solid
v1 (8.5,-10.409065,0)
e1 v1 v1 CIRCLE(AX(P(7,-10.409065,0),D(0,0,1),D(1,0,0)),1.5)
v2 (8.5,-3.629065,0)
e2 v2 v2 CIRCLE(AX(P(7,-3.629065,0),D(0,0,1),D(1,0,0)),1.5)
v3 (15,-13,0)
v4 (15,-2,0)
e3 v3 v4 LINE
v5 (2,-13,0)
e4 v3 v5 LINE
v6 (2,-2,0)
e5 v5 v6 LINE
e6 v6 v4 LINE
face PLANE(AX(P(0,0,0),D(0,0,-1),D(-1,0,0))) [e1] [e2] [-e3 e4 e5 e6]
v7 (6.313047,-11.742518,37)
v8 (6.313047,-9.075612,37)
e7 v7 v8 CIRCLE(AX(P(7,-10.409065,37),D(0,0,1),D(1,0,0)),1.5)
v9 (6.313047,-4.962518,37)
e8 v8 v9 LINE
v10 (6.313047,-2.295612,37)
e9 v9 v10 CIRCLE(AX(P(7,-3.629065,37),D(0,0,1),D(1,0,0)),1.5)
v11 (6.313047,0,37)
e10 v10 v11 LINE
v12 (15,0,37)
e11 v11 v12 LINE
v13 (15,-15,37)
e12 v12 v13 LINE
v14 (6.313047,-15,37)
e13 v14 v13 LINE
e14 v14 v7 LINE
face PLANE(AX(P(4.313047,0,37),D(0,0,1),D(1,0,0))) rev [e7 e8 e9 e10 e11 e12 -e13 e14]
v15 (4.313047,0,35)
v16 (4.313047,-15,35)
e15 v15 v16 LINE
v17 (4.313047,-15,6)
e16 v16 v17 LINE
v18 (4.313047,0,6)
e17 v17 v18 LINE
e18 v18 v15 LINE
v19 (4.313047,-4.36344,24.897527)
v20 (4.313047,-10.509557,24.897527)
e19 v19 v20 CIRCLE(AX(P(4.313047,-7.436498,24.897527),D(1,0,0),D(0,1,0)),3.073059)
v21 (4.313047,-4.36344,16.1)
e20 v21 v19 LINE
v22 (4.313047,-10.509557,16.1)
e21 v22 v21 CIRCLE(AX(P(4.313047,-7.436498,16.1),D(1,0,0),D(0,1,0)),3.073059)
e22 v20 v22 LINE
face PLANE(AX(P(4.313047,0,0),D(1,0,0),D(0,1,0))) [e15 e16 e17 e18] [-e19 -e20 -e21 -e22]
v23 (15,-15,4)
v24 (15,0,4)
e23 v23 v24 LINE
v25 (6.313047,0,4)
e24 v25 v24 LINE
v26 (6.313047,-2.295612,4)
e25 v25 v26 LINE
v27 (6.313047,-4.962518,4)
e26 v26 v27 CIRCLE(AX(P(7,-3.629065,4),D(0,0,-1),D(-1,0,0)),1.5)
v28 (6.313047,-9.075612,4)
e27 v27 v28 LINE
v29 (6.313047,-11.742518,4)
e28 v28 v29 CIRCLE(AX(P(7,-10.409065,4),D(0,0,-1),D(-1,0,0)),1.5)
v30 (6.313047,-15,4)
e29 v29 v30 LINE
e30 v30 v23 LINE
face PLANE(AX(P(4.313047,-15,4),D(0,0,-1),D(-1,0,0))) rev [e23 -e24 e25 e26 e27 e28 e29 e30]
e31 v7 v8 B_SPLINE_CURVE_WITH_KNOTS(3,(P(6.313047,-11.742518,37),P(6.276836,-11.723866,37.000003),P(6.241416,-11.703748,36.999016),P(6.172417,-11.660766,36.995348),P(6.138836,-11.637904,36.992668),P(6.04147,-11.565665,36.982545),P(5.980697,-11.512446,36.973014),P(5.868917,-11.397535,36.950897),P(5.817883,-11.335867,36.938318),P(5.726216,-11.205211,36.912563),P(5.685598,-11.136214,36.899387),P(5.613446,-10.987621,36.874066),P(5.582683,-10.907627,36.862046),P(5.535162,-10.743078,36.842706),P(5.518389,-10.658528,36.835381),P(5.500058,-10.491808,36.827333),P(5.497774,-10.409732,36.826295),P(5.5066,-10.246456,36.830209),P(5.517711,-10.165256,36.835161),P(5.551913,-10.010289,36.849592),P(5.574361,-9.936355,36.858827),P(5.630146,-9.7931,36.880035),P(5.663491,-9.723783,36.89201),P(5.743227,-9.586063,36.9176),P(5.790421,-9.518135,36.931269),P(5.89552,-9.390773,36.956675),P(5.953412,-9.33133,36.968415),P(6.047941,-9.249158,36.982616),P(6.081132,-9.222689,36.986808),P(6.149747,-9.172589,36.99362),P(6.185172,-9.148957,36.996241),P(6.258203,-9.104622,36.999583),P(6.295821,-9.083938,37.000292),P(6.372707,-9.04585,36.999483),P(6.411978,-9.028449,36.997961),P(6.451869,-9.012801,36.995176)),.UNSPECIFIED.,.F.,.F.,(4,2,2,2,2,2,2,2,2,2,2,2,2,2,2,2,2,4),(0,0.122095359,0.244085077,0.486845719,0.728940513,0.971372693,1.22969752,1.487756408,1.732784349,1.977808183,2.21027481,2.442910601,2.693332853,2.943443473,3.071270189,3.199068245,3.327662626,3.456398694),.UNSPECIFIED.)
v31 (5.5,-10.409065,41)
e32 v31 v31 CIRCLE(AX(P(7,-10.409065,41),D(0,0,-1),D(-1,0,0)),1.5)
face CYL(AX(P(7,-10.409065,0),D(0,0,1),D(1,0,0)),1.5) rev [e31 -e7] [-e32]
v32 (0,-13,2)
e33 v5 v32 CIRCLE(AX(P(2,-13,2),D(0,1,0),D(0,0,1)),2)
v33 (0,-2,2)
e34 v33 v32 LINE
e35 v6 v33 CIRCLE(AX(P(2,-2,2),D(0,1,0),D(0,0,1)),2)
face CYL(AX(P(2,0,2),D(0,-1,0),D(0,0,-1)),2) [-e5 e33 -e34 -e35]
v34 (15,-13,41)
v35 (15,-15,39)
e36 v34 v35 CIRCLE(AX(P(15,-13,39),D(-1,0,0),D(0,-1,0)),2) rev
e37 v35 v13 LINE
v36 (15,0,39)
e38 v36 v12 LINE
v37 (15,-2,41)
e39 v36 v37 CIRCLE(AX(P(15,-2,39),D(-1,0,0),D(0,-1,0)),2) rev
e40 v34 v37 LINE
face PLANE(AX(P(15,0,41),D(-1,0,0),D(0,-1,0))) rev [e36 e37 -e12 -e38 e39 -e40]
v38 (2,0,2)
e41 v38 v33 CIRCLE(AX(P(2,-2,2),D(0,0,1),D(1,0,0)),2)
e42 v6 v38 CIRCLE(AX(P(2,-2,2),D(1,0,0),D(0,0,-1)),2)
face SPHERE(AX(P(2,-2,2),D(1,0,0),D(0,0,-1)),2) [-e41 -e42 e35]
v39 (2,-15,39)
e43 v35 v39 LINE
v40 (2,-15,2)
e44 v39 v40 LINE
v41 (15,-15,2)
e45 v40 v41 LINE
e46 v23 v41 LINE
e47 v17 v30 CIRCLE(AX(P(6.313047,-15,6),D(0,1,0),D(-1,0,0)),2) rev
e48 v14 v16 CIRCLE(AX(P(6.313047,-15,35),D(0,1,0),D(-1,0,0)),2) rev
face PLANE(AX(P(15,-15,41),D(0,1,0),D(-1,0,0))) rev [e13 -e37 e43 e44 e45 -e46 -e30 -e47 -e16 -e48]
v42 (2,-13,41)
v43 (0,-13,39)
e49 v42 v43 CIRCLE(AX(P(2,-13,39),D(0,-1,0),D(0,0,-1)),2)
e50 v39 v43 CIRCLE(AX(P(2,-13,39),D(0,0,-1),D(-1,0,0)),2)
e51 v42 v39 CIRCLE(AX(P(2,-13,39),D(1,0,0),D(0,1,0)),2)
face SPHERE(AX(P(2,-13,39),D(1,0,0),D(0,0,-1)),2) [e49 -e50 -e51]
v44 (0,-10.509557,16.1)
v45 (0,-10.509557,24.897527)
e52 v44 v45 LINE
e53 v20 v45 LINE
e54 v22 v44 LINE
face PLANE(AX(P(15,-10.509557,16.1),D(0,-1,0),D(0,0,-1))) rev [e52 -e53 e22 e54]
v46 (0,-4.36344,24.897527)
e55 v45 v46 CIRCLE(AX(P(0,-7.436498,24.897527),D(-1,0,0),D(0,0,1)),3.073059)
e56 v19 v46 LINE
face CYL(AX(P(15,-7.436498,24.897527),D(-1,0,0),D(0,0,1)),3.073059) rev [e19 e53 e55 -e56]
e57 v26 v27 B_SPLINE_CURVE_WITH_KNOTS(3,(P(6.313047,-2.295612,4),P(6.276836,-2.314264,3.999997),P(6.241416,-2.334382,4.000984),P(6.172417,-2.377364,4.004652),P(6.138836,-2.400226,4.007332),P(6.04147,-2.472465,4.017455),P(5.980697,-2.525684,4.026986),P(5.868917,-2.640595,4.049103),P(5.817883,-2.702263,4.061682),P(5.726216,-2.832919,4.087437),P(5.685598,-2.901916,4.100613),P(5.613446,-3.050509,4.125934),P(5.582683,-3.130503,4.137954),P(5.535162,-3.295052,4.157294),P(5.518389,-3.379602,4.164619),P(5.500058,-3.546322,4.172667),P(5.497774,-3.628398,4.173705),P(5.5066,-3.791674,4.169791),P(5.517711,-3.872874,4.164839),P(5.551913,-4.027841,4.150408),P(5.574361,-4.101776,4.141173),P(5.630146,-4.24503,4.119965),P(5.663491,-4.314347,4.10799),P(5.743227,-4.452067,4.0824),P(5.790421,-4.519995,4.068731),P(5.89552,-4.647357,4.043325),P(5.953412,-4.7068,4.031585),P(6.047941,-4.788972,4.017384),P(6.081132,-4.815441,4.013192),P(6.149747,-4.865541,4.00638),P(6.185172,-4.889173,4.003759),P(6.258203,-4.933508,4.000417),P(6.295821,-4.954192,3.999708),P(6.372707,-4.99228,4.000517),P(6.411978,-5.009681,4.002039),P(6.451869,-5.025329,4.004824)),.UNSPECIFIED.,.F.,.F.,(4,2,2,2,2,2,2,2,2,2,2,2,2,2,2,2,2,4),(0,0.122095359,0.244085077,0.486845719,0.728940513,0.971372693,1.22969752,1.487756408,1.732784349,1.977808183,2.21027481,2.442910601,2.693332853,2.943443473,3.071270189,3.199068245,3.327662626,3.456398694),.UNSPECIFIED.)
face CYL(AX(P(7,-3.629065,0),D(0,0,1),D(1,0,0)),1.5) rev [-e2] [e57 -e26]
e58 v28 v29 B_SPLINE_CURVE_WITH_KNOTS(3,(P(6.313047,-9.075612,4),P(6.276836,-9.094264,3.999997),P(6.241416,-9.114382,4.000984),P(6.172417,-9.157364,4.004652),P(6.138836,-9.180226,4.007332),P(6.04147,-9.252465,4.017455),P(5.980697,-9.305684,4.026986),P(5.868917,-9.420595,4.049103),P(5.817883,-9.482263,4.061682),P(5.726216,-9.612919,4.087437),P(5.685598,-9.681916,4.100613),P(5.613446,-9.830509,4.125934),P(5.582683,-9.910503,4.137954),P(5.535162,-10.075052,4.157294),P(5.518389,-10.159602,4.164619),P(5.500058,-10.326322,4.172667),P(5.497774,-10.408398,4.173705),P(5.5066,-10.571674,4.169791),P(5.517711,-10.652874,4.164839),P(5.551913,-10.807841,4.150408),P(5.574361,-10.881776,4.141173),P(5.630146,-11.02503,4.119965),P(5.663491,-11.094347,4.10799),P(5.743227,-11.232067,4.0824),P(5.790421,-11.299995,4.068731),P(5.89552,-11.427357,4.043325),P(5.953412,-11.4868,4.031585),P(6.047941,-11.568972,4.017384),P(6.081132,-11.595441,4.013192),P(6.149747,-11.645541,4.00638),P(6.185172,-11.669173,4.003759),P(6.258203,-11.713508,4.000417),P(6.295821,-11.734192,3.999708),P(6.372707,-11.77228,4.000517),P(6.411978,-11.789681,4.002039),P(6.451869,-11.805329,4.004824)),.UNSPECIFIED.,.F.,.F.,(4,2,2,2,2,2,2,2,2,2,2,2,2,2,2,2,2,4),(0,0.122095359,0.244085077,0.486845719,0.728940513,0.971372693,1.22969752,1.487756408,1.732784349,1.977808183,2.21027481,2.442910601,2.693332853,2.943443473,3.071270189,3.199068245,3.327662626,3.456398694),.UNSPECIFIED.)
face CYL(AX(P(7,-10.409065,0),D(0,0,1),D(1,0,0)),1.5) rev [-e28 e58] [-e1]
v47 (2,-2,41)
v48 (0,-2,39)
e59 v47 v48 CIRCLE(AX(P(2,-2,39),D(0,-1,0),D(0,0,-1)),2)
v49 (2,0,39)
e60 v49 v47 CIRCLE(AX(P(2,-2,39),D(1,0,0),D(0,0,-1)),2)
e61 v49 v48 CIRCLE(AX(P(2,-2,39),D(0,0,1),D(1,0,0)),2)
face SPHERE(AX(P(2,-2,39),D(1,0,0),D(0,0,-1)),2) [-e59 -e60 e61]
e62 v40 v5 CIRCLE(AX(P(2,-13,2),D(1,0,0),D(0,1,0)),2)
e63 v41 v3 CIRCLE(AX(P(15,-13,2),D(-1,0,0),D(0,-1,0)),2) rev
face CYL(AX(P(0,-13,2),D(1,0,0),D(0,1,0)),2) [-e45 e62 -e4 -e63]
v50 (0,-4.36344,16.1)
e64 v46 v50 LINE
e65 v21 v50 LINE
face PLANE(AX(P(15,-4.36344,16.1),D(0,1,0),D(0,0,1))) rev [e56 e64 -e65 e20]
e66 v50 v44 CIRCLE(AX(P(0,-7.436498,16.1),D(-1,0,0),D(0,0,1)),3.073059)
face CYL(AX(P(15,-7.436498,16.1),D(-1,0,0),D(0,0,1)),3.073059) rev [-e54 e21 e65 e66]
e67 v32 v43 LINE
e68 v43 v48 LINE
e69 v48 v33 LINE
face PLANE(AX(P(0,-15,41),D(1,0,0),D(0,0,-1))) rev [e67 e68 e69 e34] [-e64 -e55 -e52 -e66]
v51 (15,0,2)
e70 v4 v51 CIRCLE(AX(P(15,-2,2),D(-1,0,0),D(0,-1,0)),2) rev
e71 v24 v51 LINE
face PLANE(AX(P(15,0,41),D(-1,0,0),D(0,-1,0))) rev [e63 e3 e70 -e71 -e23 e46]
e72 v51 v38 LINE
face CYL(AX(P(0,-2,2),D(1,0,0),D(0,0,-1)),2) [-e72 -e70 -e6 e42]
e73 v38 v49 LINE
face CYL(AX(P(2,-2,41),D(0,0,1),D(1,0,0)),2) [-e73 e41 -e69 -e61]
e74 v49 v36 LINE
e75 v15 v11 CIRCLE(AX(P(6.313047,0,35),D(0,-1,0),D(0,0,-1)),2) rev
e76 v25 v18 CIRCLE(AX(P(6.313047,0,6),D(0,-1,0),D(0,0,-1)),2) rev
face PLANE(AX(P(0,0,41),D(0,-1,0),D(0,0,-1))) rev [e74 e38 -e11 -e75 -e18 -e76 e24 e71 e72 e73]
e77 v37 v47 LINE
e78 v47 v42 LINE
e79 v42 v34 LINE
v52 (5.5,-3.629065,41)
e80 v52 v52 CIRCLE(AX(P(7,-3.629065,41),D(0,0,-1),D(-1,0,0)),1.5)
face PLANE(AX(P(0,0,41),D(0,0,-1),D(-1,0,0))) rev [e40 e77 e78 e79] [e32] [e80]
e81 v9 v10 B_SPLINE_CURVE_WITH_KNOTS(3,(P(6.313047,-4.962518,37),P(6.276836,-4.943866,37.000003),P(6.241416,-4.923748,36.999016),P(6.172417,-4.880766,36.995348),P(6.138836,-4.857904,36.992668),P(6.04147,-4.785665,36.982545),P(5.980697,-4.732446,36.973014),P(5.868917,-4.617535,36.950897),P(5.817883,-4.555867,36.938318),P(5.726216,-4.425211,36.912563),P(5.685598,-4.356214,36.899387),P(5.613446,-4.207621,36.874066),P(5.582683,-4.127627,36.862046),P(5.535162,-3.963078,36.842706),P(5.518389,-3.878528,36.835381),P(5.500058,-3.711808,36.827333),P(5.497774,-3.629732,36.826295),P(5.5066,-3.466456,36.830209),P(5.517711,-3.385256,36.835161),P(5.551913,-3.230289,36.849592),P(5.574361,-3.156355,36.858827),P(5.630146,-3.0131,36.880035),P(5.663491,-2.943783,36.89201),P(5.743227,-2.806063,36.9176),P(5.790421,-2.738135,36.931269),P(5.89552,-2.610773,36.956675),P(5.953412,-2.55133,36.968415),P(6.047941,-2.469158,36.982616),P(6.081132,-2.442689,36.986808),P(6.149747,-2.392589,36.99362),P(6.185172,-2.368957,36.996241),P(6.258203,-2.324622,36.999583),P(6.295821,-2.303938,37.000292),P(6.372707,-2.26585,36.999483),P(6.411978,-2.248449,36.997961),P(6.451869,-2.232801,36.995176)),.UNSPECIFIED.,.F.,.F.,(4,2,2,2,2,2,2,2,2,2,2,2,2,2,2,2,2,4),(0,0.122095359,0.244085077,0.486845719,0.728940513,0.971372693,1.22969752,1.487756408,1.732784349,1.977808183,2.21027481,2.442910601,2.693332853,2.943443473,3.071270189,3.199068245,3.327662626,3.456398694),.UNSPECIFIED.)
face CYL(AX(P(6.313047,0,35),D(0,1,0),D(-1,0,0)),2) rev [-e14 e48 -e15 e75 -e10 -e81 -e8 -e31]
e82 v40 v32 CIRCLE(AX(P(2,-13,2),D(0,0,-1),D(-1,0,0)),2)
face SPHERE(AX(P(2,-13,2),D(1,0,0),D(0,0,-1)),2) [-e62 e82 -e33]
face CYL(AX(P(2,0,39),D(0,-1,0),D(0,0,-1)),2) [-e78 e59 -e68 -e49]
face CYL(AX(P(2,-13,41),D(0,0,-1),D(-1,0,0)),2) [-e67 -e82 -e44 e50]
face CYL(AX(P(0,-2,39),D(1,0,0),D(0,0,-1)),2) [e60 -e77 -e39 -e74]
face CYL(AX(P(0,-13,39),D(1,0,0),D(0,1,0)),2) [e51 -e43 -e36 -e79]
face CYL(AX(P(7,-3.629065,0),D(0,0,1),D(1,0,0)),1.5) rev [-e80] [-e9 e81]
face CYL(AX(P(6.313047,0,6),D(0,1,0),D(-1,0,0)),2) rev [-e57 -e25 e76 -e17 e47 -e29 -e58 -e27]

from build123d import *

# Parameters (mm, degrees)
SKETCH_1_W               = 15
SKETCH_1_H               = 15
EXTRUDE_1_DEPTH          = 41
SKETCH_2_W               = 33
SKETCH_2_H               = 15
CUT_EXTRUDE_1_DEPTH      = 10.686952674
CUT_EXTRUDE_3_DEPTH      = 47.16275555
CUT_EXTRUDE_3_DEPTH_BACK = 47.16275555
SKETCH_3_R               = 1.5
CUT_EXTRUDE_4_DEPTH      = 47.16275555
FILLET_1_R               = 2
FILLET_2_R               = 2
FILLET_3_R               = 2
FILLET_4_R               = 2
FILLET_5_R               = 2
FILLET_6_R               = 2
FILLET_7_R               = 2


with BuildPart() as part:
    # 草图1 → 凸台-拉伸1 (new body)
    with BuildSketch(Plane.XY):
        with Locations((7.5, -7.5)):
            Rectangle(SKETCH_1_W, SKETCH_1_H)
    extrude(amount=EXTRUDE_1_DEPTH)

    # 草图2 → 切除-拉伸1 (cut)
    with BuildSketch(Plane(origin=(15, 0, 0), x_dir=(0, 0, -1), z_dir=(1, 0, 0))):
        with Locations((-20.5, -7.5)):
            Rectangle(SKETCH_2_W, SKETCH_2_H)
    extrude(amount=-CUT_EXTRUDE_1_DEPTH, mode=Mode.SUBTRACT)

    # 草图3 → 切除-拉伸3 (cut, two sides: drawn at the far end of the back side and taken through both)
    with BuildSketch(Plane.XY.offset(41).offset(-CUT_EXTRUDE_3_DEPTH_BACK)):
        with Locations((7, -3.629065036)):
            Circle(SKETCH_3_R)
        with Locations((7, -10.409065036)):
            Circle(SKETCH_3_R)
    extrude(amount=CUT_EXTRUDE_3_DEPTH + CUT_EXTRUDE_3_DEPTH_BACK, mode=Mode.SUBTRACT)

    # 草图4 → 切除-拉伸4 (cut, through all)
    with BuildSketch(Plane.ZY):
        with BuildLine():
            Line((16.1, -4.363439511), (24.89752721, -4.363439511))
            ThreePointArc((24.89752721, -4.363439511), (27.970585717, -7.436498018), (24.89752721, -10.509556524))
            Line((24.89752721, -10.509556524), (16.1, -10.509556524))
            ThreePointArc((16.1, -10.509556524), (13.026941494, -7.436498018), (16.1, -4.363439511))
        make_face()
    extrude(amount=-CUT_EXTRUDE_4_DEPTH, mode=Mode.SUBTRACT)

    # 圆角1
    fillet_1_edges = [part.edges().sort_by_distance(p)[0] for p in [
        (7.5, 0, 41),
    ]]
    fillet(fillet_1_edges, radius=FILLET_1_R)

    # 圆角2
    # the kernel refuses this fillet: 2 mm, written as the material it adds along each edge
    with BuildSketch(Plane(origin=(4.313047326, 0, 37), x_dir=(1, 0, 0), z_dir=(0, -1, 0))) as fillet_2_piece_1_section:
        with BuildLine():
            CenterArc((FILLET_2_R, -FILLET_2_R), FILLET_2_R, 90, 90)
            Line((0, -FILLET_2_R), (0, 0))
            Line((0, 0), (FILLET_2_R, 0))
        make_face()
    fillet_2_piece_1 = extrude(amount=15, mode=Mode.PRIVATE)
    fillet_2_piece_1 = fillet_2_piece_1 - Plane(origin=(7, -10.409065036, 36.539920903), x_dir=(1, 0, 0), z_dir=(0, 0, 1)) * Cylinder(1.5, 38, mode=Mode.PRIVATE)
    fillet_2_piece_1 = fillet_2_piece_1 - Plane(origin=(7, -3.629065036, 36.539920903), x_dir=(1, 0, 0), z_dir=(0, 0, 1)) * Cylinder(1.5, 38, mode=Mode.PRIVATE)
    add(fillet_2_piece_1)

    # 圆角3
    # the kernel refuses this fillet: 2 mm, written as the material it adds along each edge
    with BuildSketch(Plane(origin=(4.313047326, -15, 4), x_dir=(0, 0, 1), z_dir=(0, 1, 0))) as fillet_3_piece_1_section:
        with BuildLine():
            CenterArc((FILLET_3_R, FILLET_3_R), FILLET_3_R, 180, 90)
            Line((0, FILLET_3_R), (0, 0))
            Line((0, 0), (FILLET_3_R, 0))
        make_face()
    fillet_3_piece_1 = extrude(amount=15, mode=Mode.PRIVATE)
    fillet_3_piece_1 = fillet_3_piece_1 - Plane(origin=(7, -10.409065036, 4.460079004), x_dir=(1, 0, 0), z_dir=(0, 0, 1)) * Cylinder(1.5, 38, mode=Mode.PRIVATE)
    fillet_3_piece_1 = fillet_3_piece_1 - Plane(origin=(7, -3.629065036, 4.460079004), x_dir=(1, 0, 0), z_dir=(0, 0, 1)) * Cylinder(1.5, 38, mode=Mode.PRIVATE)
    add(fillet_3_piece_1)

    # 圆角4
    fillet_4_edges = [part.edges().sort_by_distance(p)[0] for p in [
        (7.5, -15, 41),
    ]]
    fillet(fillet_4_edges, radius=FILLET_4_R)

    # 圆角5
    fillet_5_edges = [part.edges().sort_by_distance(p)[0] for p in [
        (7.5, 0, 0),
    ]]
    fillet(fillet_5_edges, radius=FILLET_5_R)

    # 圆角6
    fillet_6_edges = [part.edges().sort_by_distance(p)[0] for p in [
        (7.5, -15, 0),
    ]]
    fillet(fillet_6_edges, radius=FILLET_6_R)

    # 圆角7
    fillet_7_edges = [part.edges().sort_by_distance(p)[0] for p in [
        (0, -15, 20.5),
        (0, -14.414213562, 40.414213562),
        (0, -7.5, 0),
        (0, -0.585786438, 0.585786438),
        (0, -14.414213562, 0.585786438),
        (0, 0, 20.5),
        (0, -7.5, 41),
        (0, -0.585786438, 40.414213562),
    ]]
    fillet(fillet_7_edges, radius=FILLET_7_R)


solid = part.part
